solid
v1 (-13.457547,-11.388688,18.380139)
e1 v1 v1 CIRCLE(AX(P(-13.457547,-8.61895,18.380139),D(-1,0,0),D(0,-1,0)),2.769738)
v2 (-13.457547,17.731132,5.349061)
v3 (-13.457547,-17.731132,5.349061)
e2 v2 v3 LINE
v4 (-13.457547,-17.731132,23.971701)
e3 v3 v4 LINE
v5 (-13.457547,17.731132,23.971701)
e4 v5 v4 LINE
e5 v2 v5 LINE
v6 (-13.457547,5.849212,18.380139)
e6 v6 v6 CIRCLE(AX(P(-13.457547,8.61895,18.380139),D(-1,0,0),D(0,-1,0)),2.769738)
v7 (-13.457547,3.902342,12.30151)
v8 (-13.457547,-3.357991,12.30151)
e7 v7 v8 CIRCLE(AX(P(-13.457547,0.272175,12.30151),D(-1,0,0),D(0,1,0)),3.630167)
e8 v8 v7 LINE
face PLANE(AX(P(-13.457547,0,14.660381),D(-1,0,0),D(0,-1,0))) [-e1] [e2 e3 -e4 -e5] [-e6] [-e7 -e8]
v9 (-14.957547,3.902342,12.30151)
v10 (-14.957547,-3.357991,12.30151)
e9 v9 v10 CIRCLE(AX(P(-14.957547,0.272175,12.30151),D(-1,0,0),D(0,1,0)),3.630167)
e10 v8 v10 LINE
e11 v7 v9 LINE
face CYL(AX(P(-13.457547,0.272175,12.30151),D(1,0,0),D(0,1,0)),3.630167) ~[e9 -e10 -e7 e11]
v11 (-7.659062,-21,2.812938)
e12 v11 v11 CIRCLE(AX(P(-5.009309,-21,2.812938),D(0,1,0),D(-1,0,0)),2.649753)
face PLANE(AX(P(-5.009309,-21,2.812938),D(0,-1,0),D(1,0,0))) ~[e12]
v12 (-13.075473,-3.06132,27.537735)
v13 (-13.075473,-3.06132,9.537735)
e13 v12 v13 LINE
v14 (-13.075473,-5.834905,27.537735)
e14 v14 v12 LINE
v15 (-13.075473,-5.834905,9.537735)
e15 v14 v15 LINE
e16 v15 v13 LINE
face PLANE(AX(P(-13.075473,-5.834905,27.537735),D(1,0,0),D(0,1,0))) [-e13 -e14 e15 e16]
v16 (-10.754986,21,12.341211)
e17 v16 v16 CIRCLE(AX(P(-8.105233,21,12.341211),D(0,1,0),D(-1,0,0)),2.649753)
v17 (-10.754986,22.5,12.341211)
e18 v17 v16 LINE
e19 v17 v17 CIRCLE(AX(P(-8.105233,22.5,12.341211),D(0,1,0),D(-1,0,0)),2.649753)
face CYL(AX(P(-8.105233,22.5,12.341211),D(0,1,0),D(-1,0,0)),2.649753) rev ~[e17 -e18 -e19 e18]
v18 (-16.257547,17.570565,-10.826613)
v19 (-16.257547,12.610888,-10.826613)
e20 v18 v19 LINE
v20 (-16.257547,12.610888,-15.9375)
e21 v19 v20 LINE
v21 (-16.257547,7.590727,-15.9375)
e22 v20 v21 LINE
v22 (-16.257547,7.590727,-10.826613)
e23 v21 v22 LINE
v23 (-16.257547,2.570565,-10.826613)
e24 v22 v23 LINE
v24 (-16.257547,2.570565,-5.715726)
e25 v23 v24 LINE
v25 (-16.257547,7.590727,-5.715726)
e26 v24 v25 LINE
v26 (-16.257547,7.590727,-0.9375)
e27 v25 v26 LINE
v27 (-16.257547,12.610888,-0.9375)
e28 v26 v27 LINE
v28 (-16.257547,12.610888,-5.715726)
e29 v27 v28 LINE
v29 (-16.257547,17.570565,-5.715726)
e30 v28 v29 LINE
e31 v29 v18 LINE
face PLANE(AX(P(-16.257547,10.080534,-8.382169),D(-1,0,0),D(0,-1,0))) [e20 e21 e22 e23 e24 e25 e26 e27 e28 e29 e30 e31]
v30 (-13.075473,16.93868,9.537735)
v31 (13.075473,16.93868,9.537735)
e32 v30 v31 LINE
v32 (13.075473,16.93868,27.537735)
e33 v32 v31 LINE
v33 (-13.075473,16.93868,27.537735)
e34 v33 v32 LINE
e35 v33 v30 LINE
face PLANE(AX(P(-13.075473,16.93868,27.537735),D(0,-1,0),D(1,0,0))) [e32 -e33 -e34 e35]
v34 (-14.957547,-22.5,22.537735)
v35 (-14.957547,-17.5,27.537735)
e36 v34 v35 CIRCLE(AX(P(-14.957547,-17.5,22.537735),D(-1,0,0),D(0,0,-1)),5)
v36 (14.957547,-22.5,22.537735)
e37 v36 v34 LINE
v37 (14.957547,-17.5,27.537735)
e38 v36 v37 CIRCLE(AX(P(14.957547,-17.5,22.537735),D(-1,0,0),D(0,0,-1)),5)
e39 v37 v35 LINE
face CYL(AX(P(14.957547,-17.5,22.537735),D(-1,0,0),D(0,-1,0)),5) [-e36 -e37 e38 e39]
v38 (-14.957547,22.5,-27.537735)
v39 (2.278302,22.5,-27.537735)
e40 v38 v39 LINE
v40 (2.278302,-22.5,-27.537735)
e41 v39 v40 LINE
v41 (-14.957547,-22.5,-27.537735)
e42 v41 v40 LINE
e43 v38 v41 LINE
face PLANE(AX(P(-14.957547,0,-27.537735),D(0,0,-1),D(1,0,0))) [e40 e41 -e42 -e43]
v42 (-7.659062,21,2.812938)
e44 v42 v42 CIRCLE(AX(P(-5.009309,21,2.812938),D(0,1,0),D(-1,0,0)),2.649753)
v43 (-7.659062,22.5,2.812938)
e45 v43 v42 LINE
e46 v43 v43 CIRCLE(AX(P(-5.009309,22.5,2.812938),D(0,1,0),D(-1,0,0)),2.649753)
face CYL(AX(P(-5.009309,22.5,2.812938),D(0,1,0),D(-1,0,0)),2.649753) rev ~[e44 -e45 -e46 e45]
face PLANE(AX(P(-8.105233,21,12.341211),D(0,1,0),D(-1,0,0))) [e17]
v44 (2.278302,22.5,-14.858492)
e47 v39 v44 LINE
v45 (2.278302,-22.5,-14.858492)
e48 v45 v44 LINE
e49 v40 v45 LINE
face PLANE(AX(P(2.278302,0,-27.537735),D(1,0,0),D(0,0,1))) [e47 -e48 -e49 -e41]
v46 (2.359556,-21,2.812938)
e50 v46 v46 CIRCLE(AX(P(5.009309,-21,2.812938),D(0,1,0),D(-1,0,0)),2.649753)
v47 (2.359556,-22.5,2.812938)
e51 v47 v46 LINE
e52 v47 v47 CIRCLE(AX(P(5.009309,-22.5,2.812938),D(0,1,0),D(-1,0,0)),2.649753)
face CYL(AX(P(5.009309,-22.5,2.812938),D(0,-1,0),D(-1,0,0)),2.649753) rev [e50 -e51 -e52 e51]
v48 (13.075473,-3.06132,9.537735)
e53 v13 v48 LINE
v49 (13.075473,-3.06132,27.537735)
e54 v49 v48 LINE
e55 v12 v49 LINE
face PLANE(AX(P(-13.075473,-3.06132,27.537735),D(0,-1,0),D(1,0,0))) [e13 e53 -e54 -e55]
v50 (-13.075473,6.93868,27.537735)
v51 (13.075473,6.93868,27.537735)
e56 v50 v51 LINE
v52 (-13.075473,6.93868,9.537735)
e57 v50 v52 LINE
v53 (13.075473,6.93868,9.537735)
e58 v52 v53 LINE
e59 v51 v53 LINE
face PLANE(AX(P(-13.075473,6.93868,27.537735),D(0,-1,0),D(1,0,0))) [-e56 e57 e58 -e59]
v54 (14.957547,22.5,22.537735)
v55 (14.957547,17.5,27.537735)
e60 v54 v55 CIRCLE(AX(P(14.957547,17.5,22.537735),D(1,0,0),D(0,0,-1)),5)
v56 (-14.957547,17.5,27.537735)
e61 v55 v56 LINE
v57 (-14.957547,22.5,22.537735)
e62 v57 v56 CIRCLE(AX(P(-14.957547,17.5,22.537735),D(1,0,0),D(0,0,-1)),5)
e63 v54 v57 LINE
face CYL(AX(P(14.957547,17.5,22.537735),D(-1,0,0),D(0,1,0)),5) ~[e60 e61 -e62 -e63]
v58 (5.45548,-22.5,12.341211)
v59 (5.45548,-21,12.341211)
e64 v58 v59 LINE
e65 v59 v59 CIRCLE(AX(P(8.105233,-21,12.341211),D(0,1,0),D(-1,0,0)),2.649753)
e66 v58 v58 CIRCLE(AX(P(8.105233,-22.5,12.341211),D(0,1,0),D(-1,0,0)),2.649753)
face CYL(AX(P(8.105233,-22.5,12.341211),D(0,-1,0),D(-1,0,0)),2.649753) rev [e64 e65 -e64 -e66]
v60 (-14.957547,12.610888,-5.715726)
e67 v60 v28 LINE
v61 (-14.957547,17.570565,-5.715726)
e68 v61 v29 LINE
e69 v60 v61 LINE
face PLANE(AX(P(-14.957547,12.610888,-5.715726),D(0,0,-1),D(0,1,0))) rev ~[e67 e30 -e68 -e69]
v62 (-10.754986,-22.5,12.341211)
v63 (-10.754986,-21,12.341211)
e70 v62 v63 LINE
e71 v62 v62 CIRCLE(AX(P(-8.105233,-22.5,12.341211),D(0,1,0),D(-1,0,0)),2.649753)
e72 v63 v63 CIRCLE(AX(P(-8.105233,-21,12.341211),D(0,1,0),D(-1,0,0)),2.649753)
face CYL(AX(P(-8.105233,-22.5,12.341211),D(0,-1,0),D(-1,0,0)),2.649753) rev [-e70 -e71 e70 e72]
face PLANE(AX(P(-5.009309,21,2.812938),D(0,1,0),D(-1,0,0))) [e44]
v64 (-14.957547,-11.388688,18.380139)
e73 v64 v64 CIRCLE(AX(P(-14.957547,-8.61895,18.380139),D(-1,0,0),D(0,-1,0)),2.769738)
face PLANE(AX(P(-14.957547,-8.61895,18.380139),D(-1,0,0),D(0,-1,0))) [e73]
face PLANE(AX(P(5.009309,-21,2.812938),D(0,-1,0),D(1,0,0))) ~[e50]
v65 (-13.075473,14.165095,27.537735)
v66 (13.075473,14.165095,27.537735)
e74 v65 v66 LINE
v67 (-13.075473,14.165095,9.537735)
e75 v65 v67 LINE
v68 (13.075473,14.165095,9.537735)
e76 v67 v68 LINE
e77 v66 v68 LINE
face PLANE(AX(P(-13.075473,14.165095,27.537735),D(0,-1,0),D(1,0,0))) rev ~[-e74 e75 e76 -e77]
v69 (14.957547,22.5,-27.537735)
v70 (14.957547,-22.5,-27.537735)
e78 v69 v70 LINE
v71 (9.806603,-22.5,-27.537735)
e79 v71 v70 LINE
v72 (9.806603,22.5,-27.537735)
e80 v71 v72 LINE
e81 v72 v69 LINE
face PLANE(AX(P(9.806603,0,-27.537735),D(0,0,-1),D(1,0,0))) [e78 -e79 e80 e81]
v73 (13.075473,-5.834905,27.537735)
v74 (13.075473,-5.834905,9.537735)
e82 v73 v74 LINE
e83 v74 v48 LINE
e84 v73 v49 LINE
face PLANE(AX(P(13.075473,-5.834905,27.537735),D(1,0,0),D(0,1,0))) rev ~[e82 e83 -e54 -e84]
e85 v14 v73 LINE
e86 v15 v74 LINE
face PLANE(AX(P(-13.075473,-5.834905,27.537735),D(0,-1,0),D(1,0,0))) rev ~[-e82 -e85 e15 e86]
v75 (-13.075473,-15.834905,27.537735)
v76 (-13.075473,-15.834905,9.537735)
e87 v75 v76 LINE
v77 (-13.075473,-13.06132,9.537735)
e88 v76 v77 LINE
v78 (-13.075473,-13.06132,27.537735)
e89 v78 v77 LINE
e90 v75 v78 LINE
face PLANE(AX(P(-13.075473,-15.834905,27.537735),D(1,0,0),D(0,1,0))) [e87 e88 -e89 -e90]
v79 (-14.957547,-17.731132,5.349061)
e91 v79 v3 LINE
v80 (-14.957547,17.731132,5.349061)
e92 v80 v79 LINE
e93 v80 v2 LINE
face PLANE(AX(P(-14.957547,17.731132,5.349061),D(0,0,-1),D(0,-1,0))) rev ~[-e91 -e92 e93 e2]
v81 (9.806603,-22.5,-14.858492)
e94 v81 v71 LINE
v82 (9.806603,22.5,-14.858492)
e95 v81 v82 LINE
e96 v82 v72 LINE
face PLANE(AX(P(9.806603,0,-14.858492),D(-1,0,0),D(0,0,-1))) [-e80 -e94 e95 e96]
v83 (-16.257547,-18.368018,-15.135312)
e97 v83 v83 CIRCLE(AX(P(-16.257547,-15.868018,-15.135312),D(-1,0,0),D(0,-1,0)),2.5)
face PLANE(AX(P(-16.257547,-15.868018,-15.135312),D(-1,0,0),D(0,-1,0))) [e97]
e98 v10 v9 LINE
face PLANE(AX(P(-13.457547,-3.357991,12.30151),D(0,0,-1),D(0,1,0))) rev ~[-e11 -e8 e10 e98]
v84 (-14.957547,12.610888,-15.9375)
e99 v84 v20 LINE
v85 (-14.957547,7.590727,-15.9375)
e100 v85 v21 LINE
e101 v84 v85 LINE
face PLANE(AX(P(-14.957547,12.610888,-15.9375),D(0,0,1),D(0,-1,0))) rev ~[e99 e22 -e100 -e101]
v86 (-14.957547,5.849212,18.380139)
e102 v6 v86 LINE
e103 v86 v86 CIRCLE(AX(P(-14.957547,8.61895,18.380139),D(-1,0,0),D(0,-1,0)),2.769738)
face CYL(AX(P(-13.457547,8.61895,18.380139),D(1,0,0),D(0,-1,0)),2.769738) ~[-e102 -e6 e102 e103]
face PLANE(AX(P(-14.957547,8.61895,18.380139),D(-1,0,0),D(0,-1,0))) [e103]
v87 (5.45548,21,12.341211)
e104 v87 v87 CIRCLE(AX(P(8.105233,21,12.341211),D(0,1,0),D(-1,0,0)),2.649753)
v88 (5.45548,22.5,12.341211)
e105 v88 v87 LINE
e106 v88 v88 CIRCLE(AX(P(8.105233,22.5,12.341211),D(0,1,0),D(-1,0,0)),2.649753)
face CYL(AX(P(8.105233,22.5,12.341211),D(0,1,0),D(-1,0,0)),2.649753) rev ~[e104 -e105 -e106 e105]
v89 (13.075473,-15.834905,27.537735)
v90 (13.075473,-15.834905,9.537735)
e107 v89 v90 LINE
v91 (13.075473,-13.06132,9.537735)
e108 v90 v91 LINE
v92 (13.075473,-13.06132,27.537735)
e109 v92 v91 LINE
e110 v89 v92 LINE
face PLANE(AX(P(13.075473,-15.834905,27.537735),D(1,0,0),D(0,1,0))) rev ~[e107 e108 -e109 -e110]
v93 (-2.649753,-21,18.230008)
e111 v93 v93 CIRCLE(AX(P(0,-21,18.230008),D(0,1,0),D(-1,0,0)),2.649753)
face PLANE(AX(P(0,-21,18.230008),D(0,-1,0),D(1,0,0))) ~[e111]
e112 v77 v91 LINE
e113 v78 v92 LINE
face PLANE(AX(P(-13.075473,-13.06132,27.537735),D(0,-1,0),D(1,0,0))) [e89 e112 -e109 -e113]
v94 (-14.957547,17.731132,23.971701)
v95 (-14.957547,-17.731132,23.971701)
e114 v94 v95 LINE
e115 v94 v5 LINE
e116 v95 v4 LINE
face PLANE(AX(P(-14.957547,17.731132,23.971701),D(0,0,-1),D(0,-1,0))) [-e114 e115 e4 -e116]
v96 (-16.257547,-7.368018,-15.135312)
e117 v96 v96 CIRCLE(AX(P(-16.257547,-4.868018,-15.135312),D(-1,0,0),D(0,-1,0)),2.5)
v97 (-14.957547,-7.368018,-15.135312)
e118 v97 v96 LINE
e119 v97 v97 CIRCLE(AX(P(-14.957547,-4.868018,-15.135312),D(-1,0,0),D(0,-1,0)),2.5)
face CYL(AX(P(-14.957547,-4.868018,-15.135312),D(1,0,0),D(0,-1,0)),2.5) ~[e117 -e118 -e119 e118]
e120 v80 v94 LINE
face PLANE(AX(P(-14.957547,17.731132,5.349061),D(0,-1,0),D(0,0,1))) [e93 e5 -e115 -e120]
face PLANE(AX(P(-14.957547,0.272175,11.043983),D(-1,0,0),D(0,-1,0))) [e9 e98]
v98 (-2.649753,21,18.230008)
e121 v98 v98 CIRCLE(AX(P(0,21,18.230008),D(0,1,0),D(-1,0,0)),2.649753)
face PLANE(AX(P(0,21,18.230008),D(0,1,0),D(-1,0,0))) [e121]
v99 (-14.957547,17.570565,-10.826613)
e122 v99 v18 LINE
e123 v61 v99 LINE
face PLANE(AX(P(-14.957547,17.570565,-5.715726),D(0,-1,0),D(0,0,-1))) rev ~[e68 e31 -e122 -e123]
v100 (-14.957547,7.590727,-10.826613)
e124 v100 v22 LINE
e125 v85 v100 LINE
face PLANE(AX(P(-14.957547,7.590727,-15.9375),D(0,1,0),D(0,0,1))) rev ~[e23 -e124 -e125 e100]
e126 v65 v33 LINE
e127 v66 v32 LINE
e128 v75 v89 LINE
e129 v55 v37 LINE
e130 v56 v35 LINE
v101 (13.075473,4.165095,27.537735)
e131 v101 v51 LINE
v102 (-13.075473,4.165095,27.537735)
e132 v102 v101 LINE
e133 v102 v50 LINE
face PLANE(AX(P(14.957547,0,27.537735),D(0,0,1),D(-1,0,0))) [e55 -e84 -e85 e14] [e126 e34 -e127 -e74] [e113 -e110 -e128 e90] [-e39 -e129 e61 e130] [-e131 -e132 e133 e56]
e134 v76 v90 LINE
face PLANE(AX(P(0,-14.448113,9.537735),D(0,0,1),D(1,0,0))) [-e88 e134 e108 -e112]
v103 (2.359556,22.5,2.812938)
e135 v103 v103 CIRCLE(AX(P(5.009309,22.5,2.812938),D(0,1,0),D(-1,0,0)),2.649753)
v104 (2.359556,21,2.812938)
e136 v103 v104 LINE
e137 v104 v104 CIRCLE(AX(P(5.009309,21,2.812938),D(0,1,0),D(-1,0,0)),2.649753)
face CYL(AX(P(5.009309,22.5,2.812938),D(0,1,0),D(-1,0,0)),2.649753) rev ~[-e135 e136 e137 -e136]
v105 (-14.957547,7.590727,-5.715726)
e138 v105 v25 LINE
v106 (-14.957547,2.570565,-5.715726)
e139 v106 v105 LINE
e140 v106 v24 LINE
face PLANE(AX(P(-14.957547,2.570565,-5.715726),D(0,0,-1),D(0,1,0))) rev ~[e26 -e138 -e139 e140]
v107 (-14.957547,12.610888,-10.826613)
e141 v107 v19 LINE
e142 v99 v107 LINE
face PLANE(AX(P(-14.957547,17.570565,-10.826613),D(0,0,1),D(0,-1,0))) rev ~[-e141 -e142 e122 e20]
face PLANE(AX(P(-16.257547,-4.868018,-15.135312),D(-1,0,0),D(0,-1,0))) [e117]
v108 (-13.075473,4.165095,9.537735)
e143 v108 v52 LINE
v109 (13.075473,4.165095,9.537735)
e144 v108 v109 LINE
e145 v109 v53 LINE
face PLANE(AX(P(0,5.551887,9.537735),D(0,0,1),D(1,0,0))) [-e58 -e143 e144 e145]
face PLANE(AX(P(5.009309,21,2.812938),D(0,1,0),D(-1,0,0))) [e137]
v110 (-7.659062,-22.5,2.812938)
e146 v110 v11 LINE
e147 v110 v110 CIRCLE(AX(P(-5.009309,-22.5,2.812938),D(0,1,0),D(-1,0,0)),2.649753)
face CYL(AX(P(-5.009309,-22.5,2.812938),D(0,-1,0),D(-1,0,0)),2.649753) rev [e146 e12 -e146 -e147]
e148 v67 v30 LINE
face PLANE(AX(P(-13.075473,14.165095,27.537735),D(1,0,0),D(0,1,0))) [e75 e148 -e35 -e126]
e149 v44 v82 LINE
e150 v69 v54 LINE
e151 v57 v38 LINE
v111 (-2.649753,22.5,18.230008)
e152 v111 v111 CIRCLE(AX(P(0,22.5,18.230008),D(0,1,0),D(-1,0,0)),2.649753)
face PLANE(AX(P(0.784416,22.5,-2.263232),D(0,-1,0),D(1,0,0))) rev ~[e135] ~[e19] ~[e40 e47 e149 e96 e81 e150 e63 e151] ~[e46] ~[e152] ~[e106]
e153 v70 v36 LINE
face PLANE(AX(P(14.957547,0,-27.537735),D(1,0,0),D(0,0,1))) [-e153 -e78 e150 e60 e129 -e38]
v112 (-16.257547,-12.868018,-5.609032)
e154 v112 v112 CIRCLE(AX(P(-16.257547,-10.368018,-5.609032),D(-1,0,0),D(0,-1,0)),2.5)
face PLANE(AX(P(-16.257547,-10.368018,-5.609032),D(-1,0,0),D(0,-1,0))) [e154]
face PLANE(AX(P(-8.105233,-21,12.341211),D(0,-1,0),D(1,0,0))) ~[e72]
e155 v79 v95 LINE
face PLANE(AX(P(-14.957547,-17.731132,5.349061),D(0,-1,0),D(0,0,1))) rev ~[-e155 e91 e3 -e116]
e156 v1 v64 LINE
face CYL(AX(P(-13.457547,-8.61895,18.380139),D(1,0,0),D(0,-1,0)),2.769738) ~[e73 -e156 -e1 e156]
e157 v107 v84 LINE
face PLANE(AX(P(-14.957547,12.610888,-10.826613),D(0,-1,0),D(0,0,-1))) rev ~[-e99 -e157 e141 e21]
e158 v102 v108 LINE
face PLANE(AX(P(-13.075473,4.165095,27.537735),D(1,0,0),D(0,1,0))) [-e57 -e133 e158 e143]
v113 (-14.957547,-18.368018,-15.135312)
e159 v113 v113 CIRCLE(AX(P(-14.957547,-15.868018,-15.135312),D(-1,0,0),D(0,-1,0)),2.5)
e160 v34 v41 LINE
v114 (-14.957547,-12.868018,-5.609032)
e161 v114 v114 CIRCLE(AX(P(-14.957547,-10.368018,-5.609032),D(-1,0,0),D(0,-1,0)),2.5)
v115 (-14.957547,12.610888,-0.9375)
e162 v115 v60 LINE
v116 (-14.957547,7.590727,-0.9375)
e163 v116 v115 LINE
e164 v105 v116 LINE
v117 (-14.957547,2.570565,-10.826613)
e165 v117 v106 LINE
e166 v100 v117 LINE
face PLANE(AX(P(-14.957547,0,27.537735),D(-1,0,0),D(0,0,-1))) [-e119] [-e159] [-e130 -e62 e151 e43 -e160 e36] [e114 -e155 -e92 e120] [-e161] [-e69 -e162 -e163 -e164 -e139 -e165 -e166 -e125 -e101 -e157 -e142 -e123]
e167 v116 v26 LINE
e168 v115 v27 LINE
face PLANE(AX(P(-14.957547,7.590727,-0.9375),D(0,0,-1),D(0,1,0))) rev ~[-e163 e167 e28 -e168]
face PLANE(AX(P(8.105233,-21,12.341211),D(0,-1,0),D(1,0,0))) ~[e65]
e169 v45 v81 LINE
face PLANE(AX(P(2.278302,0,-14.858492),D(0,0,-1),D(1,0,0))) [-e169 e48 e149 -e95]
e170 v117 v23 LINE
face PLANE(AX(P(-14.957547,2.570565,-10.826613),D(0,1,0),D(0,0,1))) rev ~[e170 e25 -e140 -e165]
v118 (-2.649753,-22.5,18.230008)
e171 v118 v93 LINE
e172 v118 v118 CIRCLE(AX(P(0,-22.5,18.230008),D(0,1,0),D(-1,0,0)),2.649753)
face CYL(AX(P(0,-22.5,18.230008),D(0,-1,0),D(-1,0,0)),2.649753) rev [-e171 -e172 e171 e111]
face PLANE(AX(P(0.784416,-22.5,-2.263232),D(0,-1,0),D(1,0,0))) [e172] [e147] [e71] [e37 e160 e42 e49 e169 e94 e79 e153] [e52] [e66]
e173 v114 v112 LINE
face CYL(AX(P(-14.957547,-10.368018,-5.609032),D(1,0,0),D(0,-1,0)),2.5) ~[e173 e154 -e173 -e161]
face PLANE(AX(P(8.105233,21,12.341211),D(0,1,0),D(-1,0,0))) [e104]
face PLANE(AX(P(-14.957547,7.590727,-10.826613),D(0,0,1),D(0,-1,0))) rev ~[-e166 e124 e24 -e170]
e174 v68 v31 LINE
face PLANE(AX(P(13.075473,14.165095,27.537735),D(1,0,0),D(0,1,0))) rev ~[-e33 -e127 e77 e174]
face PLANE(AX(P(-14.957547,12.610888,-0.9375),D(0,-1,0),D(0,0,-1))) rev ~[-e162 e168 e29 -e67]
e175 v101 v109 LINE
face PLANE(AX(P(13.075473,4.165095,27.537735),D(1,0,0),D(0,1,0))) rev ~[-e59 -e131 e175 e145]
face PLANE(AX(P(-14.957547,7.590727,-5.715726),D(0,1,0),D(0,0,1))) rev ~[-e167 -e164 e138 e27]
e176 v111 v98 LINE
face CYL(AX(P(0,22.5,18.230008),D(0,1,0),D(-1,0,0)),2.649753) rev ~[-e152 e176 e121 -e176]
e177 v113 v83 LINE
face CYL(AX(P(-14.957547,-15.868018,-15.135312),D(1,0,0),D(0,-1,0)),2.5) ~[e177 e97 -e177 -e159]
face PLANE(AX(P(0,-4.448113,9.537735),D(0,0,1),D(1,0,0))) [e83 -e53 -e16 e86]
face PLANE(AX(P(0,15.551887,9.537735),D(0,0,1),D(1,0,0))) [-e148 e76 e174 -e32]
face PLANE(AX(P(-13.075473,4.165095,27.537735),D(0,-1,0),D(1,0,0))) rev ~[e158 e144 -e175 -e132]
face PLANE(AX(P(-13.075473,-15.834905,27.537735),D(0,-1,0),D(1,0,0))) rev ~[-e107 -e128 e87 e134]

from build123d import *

# Parameters (mm, degrees)
F1_DEPTH  = 22.5
F3_W      = 26.150945574
F3_H      = 2.773584798
F4_DEPTH  = 18
F7_R      = 5
F6_W      = 35.4622639716
F6_H      = 18.6226405203
F8_DEPTH  = 1.5
F10_R     = 2.7697383404
F11_DEPTH = 1.5
F14_R     = 2.5
F15_DEPTH = 1.3
F17_R     = 2.6497529256
F18_DEPTH = 1.5


# Not quite as in the source:
# - a pattern or mirror of a feature is missing from the dataset's text; its kind, count and spacing are read off the source's solid


with BuildPart() as f1:
    # F0 (on Front) → F1 (new body, symmetric)
    with BuildSketch(Plane.XZ):
        Polygon((9.8066031933, -27.5377351791), (14.9575471878, -27.5377351791), (14.9575471878, 27.5377351791), (-14.9575471878, 27.5377351791), (-14.9575471878, -27.5377351791), (2.2783020977, -27.5377351791), (2.2783020977, -14.8584917188), (9.8066031933, -14.8584917188), align=None)
    extrude(amount=F1_DEPTH, both=True)

    # F3 (on offset) → F4 (cut)
    with BuildSketch(Plane.XY.offset(27.5377351791)):
        with Locations((0, 15.5518874526)):
            Rectangle(F3_W, F3_H)
        with Locations((0, 5.5518874526)):
            Rectangle(F3_W, F3_H)
        with Locations((0, -4.4481125474)):
            Rectangle(F3_W, F3_H)
        with Locations((0, -14.4481125474)):
            Rectangle(F3_W, F3_H)
    extrude(amount=-F4_DEPTH, mode=Mode.SUBTRACT)

    # F7
    f7_edges = [f1.edges().sort_by_distance(p)[0] for p in [
        (0, -22.5, 27.537735),
        (0, 22.5, 27.537735),
    ]]
    fillet(f7_edges, radius=F7_R)

    # F6 (on offset) → F8 (cut)
    with BuildSketch(Plane(origin=(-14.9575471878, 0, 0), x_dir=(0, -1, 0), z_dir=(-1, 0, 0))):
        with Locations((0, 14.6603807807)):
            Rectangle(F6_W, F6_H)
    extrude(amount=-F8_DEPTH, mode=Mode.SUBTRACT)

    # F10 (on offset) → F11 (join)
    with BuildSketch(Plane(origin=(-13.4575471878, 0, 0), x_dir=(0, -1, 0), z_dir=(-1, 0, 0))):
        with Locations((-8.6189499125, 18.3801390231)):
            Circle(F10_R)
        with Locations((8.6189499125, 18.3801390231)):
            Circle(F10_R)
        with BuildLine():
            Line((3.3579913629, 12.3015097342), (-3.90234219, 12.3015097342))
            ThreePointArc((-3.90234219, 12.3015097342), (-0.2721754136, 8.6713429578), (3.3579913629, 12.3015097342))
        make_face()
    extrude(amount=F11_DEPTH)

    # F13 (on offset) + F14 (on offset) → F15 (join)
    with BuildSketch(Plane(origin=(-14.9575471878, 0, 0), x_dir=(0, -1, 0), z_dir=(-1, 0, 0))):
        Polygon((-12.6108881086, -15.9375003353), (-7.5907266326, -15.9375003353), (-7.5907266326, -10.8266131394), (-2.5705651566, -10.8266131394), (-2.5705651566, -5.7157259434), (-7.5907266326, -5.7157259434), (-7.5907266326, -0.9375003353), (-12.6108881086, -0.9375003353), (-12.6108881086, -5.7157259434), (-17.5705651566, -5.7157259434), (-17.5705651566, -10.8266131394), (-12.6108881086, -10.8266131394), align=None)
    with BuildSketch(Plane(origin=(-14.9575471878, 0, 0), x_dir=(0, -1, 0), z_dir=(-1, 0, 0))):
        with Locations((10.3680184111, -5.60903208)):
            Circle(F14_R)
        with Locations((4.8680184111, -15.1353115216)):
            Circle(F14_R)
        with Locations((15.8680184111, -15.1353115216)):
            Circle(F14_R)
    extrude(amount=F15_DEPTH)

    # F17 (on offset) → F18 (cut)
    with BuildSketch(Plane(origin=(0, 22.5, 0), x_dir=(-1, 0, 0), z_dir=(0, 1, 0))):
        with Locations((0, 18.2300075523)):
            Circle(F17_R)
        with Locations((8.105232894, 12.3412111554)):
            Circle(F17_R)
        with Locations((5.0093094152, 2.8129384324)):
            Circle(F17_R)
        with Locations((-5.0093094152, 2.8129384324)):
            Circle(F17_R)
        with Locations((-8.105232894, 12.3412111554)):
            Circle(F17_R)
    f18 = extrude(amount=-F18_DEPTH, mode=Mode.SUBTRACT)

    # F18_copies: F18 across plane
    add(f18.mirror(Plane(origin=(0, 0, 0), x_dir=(0, 0, -1), z_dir=(0, -1, 0))), mode=Mode.SUBTRACT)


solid = f1.part
